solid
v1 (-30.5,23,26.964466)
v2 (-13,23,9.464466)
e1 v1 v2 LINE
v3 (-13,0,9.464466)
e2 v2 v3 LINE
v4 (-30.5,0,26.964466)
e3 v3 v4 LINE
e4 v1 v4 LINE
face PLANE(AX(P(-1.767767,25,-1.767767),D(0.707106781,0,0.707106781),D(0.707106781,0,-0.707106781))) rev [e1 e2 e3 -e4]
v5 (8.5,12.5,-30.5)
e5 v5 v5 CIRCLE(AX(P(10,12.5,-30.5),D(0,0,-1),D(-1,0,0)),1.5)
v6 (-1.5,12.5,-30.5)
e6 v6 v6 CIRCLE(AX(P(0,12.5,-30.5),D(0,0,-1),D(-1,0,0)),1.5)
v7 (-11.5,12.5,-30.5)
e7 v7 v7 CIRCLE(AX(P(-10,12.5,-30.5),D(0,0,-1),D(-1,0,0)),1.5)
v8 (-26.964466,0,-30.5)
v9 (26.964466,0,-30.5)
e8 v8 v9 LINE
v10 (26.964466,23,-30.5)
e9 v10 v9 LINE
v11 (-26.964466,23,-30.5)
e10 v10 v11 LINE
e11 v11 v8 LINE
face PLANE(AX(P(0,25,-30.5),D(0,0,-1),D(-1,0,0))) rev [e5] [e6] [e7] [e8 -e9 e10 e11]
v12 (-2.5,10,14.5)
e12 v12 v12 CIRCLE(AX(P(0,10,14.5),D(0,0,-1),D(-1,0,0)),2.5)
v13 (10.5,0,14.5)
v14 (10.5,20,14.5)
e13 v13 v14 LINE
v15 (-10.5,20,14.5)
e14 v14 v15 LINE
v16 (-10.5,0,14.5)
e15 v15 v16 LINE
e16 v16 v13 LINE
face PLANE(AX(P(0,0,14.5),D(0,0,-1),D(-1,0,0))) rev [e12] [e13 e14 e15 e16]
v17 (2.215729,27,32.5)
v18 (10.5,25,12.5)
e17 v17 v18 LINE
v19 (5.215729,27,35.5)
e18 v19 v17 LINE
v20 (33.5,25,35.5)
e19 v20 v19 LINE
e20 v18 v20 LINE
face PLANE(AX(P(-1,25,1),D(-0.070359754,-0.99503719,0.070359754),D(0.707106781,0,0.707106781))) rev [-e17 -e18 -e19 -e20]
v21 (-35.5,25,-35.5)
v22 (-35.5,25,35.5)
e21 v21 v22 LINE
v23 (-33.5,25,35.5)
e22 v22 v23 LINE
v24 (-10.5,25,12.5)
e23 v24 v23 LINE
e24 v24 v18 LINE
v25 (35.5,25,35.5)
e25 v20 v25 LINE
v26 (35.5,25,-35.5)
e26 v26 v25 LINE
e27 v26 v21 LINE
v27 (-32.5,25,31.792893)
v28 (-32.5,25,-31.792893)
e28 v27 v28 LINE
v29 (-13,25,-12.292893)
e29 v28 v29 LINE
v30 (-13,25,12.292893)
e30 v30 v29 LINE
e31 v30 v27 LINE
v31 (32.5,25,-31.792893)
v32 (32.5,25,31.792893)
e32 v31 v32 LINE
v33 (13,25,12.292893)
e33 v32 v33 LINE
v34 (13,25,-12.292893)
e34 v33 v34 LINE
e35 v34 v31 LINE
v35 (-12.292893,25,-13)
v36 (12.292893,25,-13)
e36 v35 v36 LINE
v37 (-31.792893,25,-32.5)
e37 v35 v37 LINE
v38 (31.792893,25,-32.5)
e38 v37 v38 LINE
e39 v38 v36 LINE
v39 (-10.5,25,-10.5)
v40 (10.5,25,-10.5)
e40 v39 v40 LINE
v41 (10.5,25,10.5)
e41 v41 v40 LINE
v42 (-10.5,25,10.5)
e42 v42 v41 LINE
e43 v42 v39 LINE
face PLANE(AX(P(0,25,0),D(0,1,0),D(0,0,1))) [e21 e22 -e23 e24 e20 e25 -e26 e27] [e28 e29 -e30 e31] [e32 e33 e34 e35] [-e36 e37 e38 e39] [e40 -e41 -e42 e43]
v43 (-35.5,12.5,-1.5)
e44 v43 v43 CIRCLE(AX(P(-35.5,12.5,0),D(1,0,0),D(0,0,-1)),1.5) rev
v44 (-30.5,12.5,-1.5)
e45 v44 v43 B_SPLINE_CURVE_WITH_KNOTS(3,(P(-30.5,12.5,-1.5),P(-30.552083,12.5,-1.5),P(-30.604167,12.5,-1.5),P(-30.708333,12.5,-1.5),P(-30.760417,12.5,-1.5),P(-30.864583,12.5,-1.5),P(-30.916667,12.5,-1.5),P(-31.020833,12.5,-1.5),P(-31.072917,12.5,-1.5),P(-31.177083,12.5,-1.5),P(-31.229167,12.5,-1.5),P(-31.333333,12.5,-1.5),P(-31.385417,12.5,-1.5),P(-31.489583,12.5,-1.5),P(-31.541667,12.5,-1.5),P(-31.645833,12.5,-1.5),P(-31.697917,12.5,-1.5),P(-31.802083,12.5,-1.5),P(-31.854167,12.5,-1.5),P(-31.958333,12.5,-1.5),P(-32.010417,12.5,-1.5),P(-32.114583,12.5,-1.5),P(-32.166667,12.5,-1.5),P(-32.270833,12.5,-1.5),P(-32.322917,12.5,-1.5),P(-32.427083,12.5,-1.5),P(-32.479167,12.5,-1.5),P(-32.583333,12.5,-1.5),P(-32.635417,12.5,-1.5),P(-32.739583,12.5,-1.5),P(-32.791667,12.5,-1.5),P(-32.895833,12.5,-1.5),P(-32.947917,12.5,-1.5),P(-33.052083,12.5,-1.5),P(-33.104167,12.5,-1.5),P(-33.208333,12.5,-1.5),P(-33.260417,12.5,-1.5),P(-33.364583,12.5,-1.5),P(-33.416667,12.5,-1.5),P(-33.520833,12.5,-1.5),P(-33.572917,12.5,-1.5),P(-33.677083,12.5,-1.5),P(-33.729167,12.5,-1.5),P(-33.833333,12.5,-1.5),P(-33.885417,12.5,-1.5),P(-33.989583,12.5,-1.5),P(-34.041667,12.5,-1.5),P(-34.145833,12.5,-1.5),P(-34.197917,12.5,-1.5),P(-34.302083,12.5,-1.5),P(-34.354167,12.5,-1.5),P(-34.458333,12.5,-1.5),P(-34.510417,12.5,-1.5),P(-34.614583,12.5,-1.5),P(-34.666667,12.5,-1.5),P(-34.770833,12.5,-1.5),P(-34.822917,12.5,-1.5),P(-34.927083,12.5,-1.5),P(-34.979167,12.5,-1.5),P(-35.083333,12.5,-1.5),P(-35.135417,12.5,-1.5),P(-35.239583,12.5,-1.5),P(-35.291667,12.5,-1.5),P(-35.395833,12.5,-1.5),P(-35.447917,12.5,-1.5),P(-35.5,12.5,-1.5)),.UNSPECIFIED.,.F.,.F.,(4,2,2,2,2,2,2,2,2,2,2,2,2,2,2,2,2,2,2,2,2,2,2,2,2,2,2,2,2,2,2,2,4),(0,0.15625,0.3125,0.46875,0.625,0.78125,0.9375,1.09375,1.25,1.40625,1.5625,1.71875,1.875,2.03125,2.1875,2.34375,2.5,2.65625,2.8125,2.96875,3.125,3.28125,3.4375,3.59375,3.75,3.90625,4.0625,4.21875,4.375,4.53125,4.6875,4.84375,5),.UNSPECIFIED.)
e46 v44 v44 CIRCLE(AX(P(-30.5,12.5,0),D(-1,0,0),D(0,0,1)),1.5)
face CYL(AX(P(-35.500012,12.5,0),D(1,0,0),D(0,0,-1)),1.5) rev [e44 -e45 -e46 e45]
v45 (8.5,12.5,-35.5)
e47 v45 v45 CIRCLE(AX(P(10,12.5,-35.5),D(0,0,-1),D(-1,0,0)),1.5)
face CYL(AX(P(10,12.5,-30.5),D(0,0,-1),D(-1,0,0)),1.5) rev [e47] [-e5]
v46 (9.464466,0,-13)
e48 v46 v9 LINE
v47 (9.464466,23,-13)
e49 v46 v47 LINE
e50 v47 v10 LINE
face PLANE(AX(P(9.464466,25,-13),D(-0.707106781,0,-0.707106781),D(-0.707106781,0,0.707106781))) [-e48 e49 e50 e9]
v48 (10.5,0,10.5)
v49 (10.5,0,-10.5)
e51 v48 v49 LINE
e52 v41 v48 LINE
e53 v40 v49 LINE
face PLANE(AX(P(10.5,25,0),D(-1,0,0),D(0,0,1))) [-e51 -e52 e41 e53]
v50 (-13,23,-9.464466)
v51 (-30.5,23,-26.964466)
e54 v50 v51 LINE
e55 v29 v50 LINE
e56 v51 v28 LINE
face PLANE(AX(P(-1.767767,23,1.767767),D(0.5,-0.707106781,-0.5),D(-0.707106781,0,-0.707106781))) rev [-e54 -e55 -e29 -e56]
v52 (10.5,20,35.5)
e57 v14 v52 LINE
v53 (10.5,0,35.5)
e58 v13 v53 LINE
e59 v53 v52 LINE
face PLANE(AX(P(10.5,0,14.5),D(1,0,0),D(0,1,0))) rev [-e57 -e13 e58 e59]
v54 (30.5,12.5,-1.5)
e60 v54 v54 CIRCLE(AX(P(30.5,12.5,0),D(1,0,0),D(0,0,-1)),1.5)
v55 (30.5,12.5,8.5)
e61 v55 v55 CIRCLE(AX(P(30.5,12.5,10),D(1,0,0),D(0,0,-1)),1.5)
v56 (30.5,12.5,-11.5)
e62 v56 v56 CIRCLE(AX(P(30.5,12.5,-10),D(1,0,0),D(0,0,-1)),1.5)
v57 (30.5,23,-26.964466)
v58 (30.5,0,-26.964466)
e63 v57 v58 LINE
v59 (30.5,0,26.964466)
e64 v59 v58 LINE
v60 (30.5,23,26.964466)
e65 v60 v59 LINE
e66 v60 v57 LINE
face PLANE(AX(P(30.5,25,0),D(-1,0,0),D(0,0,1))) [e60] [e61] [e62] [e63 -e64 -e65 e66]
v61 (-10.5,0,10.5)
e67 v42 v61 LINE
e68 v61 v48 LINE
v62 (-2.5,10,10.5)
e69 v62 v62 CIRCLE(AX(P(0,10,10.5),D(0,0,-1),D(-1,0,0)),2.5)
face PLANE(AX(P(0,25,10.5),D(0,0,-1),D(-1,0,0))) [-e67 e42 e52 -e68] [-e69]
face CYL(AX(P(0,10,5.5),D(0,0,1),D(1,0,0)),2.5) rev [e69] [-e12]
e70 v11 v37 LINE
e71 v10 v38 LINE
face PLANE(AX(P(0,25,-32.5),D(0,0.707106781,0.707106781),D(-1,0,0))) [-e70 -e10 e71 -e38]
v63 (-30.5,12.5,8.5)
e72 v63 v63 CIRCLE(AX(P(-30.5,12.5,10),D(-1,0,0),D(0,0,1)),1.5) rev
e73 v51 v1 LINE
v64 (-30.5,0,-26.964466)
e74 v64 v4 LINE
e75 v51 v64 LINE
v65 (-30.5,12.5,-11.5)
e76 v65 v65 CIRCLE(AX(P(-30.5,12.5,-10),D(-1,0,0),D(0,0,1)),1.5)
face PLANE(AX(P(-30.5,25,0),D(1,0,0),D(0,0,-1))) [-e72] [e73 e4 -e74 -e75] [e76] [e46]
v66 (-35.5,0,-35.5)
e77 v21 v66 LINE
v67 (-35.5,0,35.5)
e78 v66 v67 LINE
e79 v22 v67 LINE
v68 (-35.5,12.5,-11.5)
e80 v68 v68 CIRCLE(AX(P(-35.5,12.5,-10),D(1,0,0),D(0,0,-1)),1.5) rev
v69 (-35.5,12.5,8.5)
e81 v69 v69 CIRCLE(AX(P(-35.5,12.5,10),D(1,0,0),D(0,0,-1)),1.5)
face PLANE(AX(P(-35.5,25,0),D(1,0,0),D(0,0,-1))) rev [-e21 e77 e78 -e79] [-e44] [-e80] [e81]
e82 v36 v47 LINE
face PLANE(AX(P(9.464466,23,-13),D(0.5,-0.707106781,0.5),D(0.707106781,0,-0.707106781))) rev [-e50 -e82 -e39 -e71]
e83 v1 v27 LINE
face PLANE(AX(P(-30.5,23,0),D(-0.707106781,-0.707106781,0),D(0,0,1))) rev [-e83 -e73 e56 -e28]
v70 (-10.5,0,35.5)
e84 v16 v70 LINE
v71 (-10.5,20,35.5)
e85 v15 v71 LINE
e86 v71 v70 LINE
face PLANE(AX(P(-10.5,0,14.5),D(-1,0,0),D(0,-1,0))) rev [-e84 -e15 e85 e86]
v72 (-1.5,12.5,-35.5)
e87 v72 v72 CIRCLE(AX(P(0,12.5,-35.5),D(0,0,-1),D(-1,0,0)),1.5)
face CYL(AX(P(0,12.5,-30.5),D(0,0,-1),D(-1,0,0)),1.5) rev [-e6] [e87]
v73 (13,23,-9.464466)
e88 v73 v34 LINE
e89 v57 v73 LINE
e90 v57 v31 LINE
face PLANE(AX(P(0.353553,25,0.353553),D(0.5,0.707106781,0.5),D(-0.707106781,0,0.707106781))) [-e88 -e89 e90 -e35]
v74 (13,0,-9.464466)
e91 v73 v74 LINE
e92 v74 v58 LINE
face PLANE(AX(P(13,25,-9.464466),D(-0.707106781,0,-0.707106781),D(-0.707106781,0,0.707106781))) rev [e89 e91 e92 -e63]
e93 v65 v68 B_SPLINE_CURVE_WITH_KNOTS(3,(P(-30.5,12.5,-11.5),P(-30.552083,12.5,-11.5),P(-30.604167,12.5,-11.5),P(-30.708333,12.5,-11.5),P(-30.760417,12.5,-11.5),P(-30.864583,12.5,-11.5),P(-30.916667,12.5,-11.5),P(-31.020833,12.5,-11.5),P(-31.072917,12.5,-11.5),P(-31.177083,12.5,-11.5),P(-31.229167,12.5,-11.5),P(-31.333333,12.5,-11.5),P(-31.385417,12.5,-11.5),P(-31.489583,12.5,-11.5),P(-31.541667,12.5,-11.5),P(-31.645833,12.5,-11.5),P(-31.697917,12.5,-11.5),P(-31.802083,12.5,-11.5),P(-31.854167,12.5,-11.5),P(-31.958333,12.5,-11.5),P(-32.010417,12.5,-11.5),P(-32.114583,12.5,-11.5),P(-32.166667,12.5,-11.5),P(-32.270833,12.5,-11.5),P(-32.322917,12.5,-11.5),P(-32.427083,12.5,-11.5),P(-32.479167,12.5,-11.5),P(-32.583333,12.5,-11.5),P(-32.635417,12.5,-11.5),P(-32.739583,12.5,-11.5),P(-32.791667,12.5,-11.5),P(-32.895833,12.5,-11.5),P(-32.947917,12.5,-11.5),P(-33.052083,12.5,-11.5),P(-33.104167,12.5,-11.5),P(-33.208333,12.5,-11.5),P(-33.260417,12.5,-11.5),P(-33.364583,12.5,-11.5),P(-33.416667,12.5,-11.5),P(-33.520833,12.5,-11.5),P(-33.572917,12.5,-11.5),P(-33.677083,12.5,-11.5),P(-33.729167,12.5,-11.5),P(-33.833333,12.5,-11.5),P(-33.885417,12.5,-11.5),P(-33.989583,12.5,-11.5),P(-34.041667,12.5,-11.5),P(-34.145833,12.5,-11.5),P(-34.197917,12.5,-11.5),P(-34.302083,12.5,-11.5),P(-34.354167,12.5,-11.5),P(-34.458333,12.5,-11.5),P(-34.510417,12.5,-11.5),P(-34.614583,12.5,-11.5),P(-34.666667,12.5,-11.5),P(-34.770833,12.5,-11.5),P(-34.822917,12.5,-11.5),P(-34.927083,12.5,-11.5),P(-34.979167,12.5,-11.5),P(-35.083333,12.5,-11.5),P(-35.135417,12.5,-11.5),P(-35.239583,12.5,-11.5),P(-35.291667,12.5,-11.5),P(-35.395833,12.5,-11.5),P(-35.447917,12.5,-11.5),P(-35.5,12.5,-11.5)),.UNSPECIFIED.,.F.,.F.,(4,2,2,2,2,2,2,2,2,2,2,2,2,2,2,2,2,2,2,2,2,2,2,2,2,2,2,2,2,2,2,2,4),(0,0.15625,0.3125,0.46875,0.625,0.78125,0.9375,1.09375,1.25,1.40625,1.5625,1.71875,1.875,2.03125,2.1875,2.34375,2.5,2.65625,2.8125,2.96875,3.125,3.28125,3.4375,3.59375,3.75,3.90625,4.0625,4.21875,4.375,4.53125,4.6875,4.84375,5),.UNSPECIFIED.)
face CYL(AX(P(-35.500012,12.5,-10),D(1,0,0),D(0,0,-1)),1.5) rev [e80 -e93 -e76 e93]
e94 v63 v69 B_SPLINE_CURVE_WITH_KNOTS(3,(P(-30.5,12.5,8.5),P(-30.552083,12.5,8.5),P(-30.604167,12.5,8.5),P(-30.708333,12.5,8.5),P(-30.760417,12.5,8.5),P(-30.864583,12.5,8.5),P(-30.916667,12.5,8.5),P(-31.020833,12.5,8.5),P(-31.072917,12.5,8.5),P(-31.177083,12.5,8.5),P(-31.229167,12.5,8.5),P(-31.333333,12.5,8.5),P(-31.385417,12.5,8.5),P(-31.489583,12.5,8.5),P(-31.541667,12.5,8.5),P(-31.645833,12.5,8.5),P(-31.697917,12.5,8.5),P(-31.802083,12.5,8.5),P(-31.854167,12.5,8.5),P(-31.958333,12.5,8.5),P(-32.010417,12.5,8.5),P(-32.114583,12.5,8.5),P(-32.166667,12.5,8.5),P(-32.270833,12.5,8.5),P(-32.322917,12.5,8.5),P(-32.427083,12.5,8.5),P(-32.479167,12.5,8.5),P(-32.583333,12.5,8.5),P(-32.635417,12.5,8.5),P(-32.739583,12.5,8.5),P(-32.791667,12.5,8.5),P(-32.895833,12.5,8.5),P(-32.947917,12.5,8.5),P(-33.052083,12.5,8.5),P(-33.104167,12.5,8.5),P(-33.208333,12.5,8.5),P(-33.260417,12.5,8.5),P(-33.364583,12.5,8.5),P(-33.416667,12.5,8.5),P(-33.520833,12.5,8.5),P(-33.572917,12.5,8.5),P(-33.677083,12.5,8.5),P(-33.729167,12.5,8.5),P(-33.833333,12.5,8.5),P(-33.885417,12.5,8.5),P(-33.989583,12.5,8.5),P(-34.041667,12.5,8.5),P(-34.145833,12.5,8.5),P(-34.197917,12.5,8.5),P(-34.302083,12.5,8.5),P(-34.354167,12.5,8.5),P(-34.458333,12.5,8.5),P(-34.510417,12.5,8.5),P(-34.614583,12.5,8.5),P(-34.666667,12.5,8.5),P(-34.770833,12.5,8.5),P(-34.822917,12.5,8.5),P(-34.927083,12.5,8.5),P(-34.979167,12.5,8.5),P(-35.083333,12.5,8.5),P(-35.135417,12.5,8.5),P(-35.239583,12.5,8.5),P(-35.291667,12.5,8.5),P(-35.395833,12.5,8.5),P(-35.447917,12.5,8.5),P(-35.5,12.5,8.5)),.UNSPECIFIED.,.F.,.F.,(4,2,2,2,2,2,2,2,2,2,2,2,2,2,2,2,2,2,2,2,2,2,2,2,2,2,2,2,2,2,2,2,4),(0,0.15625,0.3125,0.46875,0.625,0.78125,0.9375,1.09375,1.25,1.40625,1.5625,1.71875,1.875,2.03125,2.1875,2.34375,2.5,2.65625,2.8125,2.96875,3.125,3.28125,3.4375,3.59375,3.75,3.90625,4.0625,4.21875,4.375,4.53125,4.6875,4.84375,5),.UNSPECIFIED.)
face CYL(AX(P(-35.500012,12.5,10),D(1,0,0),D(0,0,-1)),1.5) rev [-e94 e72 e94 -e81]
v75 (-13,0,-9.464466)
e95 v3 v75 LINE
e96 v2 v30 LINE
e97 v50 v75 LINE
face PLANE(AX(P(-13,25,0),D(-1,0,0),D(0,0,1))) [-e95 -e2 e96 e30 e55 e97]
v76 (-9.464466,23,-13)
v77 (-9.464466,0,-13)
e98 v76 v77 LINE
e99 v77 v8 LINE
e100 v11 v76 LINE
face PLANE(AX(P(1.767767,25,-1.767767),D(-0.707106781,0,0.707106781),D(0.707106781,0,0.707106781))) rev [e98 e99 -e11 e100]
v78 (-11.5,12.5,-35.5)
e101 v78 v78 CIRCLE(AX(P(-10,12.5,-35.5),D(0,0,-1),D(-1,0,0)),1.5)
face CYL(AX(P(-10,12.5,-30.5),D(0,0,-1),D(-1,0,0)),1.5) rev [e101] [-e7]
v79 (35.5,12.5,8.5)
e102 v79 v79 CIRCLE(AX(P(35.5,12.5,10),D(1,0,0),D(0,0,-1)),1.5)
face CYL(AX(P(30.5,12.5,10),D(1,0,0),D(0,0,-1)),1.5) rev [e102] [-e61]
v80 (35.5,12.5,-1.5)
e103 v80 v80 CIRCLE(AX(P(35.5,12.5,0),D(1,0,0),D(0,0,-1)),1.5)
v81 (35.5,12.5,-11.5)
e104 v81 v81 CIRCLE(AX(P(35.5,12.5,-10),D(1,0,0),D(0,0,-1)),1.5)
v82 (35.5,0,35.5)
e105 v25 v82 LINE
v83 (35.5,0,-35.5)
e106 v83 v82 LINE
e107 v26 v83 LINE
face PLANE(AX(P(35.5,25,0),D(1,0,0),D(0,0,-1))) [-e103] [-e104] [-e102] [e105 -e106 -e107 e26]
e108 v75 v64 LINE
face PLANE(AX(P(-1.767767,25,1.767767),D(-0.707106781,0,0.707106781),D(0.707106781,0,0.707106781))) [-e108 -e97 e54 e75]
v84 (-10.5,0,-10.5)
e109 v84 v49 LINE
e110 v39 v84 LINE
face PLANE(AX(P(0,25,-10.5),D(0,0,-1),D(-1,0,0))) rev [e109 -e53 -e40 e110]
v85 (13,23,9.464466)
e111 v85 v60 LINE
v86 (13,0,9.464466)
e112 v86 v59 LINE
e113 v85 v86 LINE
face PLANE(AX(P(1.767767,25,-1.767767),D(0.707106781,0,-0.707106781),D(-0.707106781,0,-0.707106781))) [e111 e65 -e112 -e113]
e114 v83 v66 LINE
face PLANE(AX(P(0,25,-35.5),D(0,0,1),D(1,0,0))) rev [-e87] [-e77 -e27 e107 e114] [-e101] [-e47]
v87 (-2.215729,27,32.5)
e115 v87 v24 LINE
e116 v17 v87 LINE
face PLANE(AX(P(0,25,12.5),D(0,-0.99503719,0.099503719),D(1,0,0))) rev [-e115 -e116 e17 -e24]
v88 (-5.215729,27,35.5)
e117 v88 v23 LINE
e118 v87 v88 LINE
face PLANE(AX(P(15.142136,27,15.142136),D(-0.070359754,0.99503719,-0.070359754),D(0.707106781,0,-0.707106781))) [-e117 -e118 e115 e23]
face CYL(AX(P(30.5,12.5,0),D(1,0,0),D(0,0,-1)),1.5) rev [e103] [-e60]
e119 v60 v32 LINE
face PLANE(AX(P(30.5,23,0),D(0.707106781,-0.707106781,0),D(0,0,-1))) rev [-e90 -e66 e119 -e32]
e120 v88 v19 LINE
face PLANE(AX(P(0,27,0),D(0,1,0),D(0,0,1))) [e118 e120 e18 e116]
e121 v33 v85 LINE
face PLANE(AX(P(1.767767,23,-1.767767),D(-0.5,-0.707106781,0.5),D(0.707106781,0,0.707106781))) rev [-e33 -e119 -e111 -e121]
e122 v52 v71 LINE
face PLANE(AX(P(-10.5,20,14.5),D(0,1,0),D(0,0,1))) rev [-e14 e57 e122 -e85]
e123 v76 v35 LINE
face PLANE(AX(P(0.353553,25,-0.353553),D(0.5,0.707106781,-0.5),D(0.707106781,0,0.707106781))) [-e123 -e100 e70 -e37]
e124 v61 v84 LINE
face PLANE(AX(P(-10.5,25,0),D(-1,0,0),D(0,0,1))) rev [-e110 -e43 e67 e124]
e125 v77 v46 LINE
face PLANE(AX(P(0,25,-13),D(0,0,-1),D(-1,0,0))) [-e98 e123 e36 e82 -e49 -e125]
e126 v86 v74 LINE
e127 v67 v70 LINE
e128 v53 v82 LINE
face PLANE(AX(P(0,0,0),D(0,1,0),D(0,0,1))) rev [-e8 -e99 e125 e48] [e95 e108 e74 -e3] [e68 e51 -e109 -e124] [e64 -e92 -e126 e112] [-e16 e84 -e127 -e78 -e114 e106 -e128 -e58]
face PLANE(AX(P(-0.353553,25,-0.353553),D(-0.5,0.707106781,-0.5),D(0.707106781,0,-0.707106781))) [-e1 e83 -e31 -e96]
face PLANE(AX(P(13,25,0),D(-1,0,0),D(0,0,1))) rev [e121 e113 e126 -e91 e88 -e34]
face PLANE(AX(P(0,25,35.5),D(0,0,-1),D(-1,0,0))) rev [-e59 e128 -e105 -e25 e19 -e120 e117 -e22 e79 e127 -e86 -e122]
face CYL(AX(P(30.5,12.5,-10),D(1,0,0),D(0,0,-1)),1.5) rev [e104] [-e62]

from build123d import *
from OCP.BRepFilletAPI import BRepFilletAPI_MakeChamfer

# Parameters (mm, degrees)
SKETCH1_W               = 71
SKETCH1_H               = 71
SKETCH1_W_2             = 21
SKETCH1_H_2             = 21
BOSS_EXTRUDE1_DEPTH     = 25
SKETCH2_W               = 21
SKETCH2_H               = 23
BOSS_EXTRUDE2_DEPTH     = 2
CHAMFER1_SIZE           = 2
CHAMFER1_SIZE_2         = 20
CUT_EXTRUDE1_DEPTH      = 84.846586096
CUT_EXTRUDE1_DEPTH_BACK = 5
SKETCH3_R               = 1.5
SKETCH4_R               = 1.5
CUT_EXTRUDE2_DEPTH      = 5
CUT_EXTRUDE3_START      = -5
SKETCH5_R               = 1.5
CUT_EXTRUDE3_DEPTH      = 5
SKETCH6_W               = 21
SKETCH6_H               = 20
SKETCH6_R               = 2.5
CUT_EXTRUDE4_DEPTH      = 21
CUT_EXTRUDE5_DEPTH      = 30
CHAMFER2_SIZE           = 2


with BuildPart() as part:
    # Sketch1 → Boss-Extrude1 (new body)
    with BuildSketch(Plane(origin=(0, 0, 0), x_dir=(1, 0, 0), z_dir=(0, 1, 0))):
        Rectangle(SKETCH1_W, SKETCH1_H)
        Polygon((-13, 9.464466094), (-13, -9.464466094), (-30.5, -26.964466094), (-30.5, 26.964466094), align=None, mode=Mode.SUBTRACT)
        Rectangle(SKETCH1_W_2, SKETCH1_H_2, mode=Mode.SUBTRACT)
        Polygon((30.5, -26.964466094), (13, -9.464466094), (13, 9.464466094), (30.5, 26.964466094), align=None, mode=Mode.SUBTRACT)
        Polygon((9.464466094, 13), (-9.464466094, 13), (-26.964466094, 30.5), (26.964466094, 30.5), align=None, mode=Mode.SUBTRACT)
    extrude(amount=BOSS_EXTRUDE1_DEPTH)

    # Sketch2 → Boss-Extrude2 (add)
    with BuildSketch(Plane(origin=(0, 25, 0), x_dir=(1, 0, 0), z_dir=(0, 1, 0))):
        Polygon((-33.5, -35.5), (-10.5, -35.5), (-10.5, -12.5), align=None)
        with Locations((0, -24)):
            Rectangle(SKETCH2_W, SKETCH2_H)
        Polygon((10.5, -12.5), (10.5, -35.5), (33.5, -35.5), align=None)
    extrude(amount=BOSS_EXTRUDE2_DEPTH)

    # Chamfer1
    chamfer1_edges_1 = [part.edges().sort_by_distance(p)[0] for p in [
        (22, 27, 24),
    ]]
    chamfer1_side_1 = [part.faces().sort_by_distance(p)[0] for p in [
        (22, 26.96, 24),
    ]]
    chamfer1_edges_2 = [part.edges().sort_by_distance(p)[0] for p in [
        (0, 27, 12.5),
    ]]
    chamfer1_side_2 = [part.faces().sort_by_distance(p)[0] for p in [
        (0, 26.96, 12.5),
    ]]
    chamfer1_edges_3 = [part.edges().sort_by_distance(p)[0] for p in [
        (-22, 27, 24),
    ]]
    chamfer1_side_3 = [part.faces().sort_by_distance(p)[0] for p in [
        (-22, 26.96, 24),
    ]]
    chamfer1 = BRepFilletAPI_MakeChamfer(part.part.solid().wrapped)
    for e in chamfer1_edges_1:
        chamfer1.Add(CHAMFER1_SIZE - 0.0001, CHAMFER1_SIZE_2 - 0.0001, e.wrapped, chamfer1_side_1[0].wrapped)
    for e in chamfer1_edges_2:
        chamfer1.Add(CHAMFER1_SIZE - 0.0001, CHAMFER1_SIZE_2 - 0.0001, e.wrapped, chamfer1_side_2[0].wrapped)
    for e in chamfer1_edges_3:
        chamfer1.Add(CHAMFER1_SIZE - 0.0001, CHAMFER1_SIZE_2 - 0.0001, e.wrapped, chamfer1_side_3[0].wrapped)
    add(Compound.cast(chamfer1.Shape()), mode=Mode.REPLACE)  # a hair under: the kernel refuses the full size

    # Sketch3 → Cut-Extrude1 (cut, two sides: drawn at the far end of the back side and taken through both)
    with BuildSketch(Plane.ZY.offset(35.5).offset(-CUT_EXTRUDE1_DEPTH_BACK)):
        with Locations(Location((-10, 12.5, 0), (0, 0, 180))):
            Circle(SKETCH3_R)
        with BuildLine():
            ThreePointArc((0, 14), (-1.5, 12.5), (0, 11))
            Line((0, 11), (0, 14))
        make_face()
        with BuildLine():
            Line((0, 14), (0, 11))
            ThreePointArc((0, 11), (1.060660172, 11.439339828), (1.5, 12.5))
            ThreePointArc((1.5, 12.5), (1.060660172, 13.560660172), (0, 14))
        make_face()
        with Locations(Location((10, 12.5, 0), (0, 0, 180))):
            Circle(SKETCH3_R)
    extrude(amount=CUT_EXTRUDE1_DEPTH + CUT_EXTRUDE1_DEPTH_BACK, mode=Mode.SUBTRACT)

    # Sketch4 → Cut-Extrude2 (cut)
    with BuildSketch(Plane(origin=(0, 0, -35.5), x_dir=(-1, 0, 0), z_dir=(0, 0, -1))):
        with Locations((-10, 12.5)):
            Circle(SKETCH4_R)
        with Locations((0, 12.5)):
            Circle(SKETCH4_R)
        with Locations((10, 12.5)):
            Circle(SKETCH4_R)
    extrude(amount=-CUT_EXTRUDE2_DEPTH, mode=Mode.SUBTRACT)

    # Sketch5 → Cut-Extrude3 (cut)
    with BuildSketch(Plane(origin=(35.5, 0, 0), x_dir=(0, 0, -1), z_dir=(1, 0, 0)).offset(CUT_EXTRUDE3_START)):
        with Locations((-10, 12.5)):
            Circle(SKETCH5_R)
        with BuildLine():
            ThreePointArc((1.5, 12.5), (1.060660172, 13.560660172), (0, 14))
            Line((0, 14), (0, 11))
            ThreePointArc((0, 11), (1.060660172, 11.439339828), (1.5, 12.5))
        make_face()
        with BuildLine():
            Line((0, 11), (0, 14))
            ThreePointArc((0, 14), (-1.5, 12.5), (0, 11))
        make_face()
        with Locations((10, 12.5)):
            Circle(SKETCH5_R)
    extrude(amount=CUT_EXTRUDE3_DEPTH, mode=Mode.SUBTRACT)

    # Sketch6 → Cut-Extrude4 (cut)
    with BuildSketch(Plane.XY.offset(35.5)):
        with Locations((0, 10)):
            Rectangle(SKETCH6_W, SKETCH6_H)
        with Locations((0, 10)):
            Circle(SKETCH6_R, mode=Mode.SUBTRACT)
    extrude(amount=-CUT_EXTRUDE4_DEPTH, mode=Mode.SUBTRACT)

    # Sketch6<2> → Cut-Extrude5 (cut)
    with BuildSketch(Plane.XY.offset(35.5)):
        with BuildLine():
            ThreePointArc((0, 12.5), (-2.5, 10), (0, 7.5))
            Line((0, 7.5), (0, 12.5))
        make_face()
        with BuildLine():
            Line((0, 12.5), (0, 7.5))
            ThreePointArc((0, 7.5), (1.767766953, 8.232233047), (2.5, 10))
            ThreePointArc((2.5, 10), (1.767766953, 11.767766953), (0, 12.5))
        make_face()
    extrude(amount=-CUT_EXTRUDE5_DEPTH, mode=Mode.SUBTRACT)

    # Chamfer2
    chamfer2_edges = [part.edges().sort_by_distance(p)[0] for p in [
        (-18.214466094, 25, -21.75),
        (-30.5, 25, 0),
        (-21.75, 25, -18.214466094),
        (-21.75, 25, 18.214466094),
        (0, 25, -30.5),
        (30.5, 25, 0),
        (21.75, 25, 18.214466094),
        (18.214466094, 25, -21.75),
        (21.75, 25, -18.214466094),
    ]]
    chamfer(chamfer2_edges, length=CHAMFER2_SIZE)


solid = part.part
